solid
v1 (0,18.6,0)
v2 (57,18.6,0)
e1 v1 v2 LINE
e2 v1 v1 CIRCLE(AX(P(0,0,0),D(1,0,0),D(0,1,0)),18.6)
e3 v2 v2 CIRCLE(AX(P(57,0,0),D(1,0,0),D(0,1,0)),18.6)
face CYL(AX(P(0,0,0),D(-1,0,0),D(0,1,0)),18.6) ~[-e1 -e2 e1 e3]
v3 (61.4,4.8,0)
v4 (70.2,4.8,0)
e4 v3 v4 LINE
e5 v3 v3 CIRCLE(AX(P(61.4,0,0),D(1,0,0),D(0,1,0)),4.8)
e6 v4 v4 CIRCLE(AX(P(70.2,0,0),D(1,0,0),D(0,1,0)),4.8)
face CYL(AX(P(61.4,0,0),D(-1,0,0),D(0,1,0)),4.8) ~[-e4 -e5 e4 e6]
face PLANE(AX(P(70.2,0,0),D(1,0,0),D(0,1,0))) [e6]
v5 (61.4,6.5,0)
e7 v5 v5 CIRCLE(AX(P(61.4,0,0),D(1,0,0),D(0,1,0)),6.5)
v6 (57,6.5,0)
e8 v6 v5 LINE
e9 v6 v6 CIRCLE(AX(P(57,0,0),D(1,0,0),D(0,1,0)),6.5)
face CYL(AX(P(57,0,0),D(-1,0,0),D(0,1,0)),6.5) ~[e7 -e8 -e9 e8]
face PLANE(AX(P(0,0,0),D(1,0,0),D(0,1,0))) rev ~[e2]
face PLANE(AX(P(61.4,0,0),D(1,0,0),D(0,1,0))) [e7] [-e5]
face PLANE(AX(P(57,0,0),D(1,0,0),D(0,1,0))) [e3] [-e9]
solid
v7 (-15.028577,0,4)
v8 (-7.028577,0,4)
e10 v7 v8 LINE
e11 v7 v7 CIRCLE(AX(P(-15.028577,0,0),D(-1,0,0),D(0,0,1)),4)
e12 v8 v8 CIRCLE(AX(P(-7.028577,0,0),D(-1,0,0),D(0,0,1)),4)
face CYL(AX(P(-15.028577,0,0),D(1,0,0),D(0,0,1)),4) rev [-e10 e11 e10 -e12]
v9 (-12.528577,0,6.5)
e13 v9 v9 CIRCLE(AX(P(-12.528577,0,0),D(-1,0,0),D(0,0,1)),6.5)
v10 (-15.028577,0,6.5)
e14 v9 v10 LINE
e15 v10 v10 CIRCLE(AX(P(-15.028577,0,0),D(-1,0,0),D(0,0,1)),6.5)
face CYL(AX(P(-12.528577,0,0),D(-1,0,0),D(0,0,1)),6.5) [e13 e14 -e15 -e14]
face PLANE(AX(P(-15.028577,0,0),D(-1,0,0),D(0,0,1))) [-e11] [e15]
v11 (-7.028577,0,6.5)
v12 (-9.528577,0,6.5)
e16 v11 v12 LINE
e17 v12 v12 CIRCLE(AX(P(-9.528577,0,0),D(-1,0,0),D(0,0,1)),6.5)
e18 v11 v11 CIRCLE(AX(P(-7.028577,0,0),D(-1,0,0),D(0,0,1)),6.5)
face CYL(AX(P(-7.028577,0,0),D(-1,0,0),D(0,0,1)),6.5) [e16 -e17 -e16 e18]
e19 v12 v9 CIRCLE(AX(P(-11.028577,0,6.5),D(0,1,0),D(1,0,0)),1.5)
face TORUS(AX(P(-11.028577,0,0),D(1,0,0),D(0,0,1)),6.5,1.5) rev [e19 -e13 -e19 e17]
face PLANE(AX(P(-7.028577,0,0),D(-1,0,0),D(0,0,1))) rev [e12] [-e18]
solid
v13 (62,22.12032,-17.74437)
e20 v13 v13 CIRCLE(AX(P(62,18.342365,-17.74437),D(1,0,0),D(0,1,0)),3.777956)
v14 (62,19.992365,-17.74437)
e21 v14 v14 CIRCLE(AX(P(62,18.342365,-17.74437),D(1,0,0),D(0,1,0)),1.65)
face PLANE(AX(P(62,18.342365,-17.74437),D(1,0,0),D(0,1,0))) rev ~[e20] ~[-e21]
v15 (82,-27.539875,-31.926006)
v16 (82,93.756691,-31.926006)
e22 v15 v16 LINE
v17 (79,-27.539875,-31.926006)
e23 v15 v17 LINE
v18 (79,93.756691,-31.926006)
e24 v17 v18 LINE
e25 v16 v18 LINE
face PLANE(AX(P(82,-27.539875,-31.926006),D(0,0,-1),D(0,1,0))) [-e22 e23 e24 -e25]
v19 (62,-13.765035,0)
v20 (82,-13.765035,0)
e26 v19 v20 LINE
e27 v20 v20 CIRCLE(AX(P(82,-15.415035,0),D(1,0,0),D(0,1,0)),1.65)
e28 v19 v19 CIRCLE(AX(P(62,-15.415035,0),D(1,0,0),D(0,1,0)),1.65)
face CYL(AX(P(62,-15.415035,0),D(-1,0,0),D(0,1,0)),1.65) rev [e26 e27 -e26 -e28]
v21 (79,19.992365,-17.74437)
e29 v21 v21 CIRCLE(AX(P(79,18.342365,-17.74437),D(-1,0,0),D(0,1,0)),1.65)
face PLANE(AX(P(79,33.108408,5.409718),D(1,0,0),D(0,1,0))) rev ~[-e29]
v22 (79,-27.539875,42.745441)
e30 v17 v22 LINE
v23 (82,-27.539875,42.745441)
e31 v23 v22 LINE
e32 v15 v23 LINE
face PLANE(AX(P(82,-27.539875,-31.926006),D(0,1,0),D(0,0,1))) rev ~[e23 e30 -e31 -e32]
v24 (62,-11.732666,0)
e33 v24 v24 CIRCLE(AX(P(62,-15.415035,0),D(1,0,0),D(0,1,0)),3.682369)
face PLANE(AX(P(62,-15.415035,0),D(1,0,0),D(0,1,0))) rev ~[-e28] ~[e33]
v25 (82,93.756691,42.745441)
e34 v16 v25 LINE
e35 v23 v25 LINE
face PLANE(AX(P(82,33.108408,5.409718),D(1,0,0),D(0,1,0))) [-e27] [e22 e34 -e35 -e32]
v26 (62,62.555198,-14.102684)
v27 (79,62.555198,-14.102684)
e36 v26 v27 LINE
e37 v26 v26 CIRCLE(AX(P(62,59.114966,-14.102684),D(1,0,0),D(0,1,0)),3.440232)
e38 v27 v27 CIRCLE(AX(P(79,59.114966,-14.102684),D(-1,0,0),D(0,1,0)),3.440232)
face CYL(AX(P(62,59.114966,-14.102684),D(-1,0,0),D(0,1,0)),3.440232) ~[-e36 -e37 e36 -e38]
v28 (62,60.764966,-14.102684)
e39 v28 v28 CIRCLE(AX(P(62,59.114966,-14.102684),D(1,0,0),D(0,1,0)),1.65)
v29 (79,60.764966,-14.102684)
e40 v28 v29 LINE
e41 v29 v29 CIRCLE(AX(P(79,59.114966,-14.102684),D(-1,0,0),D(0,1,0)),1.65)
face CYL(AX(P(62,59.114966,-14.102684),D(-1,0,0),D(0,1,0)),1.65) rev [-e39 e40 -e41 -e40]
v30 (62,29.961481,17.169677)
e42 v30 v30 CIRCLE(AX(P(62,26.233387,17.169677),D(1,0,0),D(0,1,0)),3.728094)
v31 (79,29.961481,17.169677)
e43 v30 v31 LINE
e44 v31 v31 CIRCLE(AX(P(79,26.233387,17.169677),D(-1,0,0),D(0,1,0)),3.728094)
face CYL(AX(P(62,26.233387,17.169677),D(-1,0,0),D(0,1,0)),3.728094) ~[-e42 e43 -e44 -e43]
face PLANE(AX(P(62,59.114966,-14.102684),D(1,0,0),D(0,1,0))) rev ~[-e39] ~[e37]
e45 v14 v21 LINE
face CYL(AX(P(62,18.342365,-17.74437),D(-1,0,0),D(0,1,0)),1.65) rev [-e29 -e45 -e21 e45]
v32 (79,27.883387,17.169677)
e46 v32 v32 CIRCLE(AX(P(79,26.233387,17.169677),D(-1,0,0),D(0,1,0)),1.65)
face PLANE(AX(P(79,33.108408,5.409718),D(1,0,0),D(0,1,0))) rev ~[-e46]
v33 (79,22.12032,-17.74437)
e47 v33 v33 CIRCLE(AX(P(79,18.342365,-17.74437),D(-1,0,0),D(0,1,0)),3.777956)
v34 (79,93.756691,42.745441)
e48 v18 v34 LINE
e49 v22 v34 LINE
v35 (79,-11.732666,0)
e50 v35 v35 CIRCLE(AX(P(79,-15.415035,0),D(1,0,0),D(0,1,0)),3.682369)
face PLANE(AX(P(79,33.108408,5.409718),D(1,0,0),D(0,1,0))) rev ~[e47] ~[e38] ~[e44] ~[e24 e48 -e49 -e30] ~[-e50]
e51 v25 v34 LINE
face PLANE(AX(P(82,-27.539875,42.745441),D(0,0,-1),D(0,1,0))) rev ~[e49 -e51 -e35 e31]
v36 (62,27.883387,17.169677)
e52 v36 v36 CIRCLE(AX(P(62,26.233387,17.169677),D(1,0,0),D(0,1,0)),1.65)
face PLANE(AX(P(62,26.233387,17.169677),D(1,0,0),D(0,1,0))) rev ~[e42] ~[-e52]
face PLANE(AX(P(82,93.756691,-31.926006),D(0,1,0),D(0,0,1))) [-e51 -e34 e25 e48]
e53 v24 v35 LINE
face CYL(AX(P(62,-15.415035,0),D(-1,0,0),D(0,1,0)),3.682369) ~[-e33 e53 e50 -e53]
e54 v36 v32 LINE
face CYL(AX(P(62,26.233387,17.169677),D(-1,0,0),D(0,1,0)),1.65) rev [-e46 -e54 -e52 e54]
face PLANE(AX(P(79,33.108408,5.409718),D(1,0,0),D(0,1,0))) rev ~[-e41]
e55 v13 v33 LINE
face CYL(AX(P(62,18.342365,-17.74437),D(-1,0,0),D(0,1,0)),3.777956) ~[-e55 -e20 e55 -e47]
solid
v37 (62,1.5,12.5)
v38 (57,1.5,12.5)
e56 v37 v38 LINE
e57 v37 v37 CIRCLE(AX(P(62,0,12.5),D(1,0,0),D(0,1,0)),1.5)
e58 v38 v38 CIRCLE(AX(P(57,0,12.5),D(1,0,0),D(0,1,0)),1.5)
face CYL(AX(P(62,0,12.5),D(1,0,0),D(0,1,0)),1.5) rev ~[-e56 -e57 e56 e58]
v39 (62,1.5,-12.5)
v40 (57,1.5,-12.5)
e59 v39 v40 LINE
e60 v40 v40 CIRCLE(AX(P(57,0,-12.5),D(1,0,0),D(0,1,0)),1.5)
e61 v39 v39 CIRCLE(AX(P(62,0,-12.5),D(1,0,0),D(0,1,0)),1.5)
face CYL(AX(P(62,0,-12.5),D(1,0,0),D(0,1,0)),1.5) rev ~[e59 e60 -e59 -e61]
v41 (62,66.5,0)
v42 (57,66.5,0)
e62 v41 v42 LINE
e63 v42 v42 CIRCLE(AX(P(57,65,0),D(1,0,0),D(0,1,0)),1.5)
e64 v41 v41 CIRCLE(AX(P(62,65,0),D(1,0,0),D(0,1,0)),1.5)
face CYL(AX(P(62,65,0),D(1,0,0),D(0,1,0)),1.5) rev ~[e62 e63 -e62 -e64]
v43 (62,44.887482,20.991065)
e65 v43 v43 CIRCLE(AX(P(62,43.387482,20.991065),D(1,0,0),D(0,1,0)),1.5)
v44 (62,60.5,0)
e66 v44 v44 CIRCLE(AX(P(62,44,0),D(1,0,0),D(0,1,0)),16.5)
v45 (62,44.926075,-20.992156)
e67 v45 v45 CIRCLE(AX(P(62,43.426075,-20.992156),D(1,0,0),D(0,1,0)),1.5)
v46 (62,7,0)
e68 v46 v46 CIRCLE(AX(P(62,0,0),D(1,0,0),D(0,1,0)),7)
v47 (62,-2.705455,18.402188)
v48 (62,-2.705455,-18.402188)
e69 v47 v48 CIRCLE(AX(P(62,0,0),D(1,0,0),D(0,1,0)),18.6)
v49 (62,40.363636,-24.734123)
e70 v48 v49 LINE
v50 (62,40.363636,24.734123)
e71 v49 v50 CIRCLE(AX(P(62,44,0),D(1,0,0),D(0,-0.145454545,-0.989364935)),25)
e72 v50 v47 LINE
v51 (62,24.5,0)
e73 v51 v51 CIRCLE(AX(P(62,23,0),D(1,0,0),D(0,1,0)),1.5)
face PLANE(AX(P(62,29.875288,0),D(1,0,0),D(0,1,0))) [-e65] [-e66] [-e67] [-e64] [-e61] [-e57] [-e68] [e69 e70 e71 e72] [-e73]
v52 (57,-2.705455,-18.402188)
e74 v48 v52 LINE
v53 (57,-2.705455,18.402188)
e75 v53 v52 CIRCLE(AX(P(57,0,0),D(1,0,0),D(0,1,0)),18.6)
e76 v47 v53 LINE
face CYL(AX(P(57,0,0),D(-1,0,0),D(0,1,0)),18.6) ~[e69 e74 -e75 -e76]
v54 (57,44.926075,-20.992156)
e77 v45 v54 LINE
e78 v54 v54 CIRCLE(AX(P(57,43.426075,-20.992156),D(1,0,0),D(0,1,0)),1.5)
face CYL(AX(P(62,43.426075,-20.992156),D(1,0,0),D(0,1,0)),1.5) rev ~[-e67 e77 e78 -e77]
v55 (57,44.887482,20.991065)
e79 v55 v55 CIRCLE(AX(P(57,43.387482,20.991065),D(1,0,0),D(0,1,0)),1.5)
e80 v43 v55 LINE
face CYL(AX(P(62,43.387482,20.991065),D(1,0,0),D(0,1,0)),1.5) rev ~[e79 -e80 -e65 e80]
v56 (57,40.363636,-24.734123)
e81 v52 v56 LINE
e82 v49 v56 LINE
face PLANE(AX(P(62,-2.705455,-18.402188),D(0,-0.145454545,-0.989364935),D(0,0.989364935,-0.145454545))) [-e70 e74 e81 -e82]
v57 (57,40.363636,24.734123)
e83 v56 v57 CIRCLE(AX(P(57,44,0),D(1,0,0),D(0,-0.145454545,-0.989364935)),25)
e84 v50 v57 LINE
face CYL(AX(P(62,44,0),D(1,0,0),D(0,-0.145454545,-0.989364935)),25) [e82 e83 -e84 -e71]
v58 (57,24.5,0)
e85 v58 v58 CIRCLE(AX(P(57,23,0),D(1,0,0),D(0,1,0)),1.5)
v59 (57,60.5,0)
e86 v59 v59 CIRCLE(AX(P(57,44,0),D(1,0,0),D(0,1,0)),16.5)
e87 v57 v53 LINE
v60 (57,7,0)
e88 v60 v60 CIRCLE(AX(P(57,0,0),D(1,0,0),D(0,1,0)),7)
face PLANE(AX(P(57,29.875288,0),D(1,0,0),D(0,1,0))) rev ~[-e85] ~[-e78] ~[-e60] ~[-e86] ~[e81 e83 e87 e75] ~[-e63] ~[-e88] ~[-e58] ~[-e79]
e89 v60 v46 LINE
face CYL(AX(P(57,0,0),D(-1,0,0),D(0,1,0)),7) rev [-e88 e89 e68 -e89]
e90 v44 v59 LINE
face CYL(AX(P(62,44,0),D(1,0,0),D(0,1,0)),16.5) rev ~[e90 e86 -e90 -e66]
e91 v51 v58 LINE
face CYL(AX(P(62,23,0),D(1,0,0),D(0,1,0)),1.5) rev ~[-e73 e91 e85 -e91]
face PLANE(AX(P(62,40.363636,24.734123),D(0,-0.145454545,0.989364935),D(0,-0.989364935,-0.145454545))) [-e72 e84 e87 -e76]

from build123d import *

# Parameters (mm, degrees)
F0_R      = 18.6
F1_DEPTH  = 57
F2_R      = 6.5
F3_DEPTH  = 4.4
F4_R      = 4.8
F5_DEPTH  = 8.8
F6_R      = 18.6
F6_R_2    = 7
F7_DEPTH  = 5
F8_R      = 25
F8_R_2    = 16.5
F9_DEPTH  = 5
F11_R     = 16.5
F12_DEPTH = 5
F13_R     = 1.5
F14_DEPTH = 25
F15_R     = 1.5
F16_DEPTH = 25
F20_R     = 3.7280937336
F20_R_2   = 1.65
F21_DEPTH = 20
F20_R_3   = 3.440231923
F20_R_4   = 3.7779559
F20_R_5   = 3.6823688958
F22_W     = 121.2965659797
F22_H     = 74.6714472771
F22_R     = 3.6823688958
F23_DEPTH = 3


with BuildPart() as f1:
    # F0 (on Right) → F1 (new body)
    with BuildSketch(Plane.YZ):
        Circle(F0_R)
    extrude(amount=F1_DEPTH)

    # F2 (on face) → F3 (join)
    with BuildSketch(Plane.YZ.offset(57)):
        Circle(F2_R)
    extrude(amount=F3_DEPTH)

    # F4 (on face) → F5 (join)
    with BuildSketch(Plane.YZ.offset(61.4)):
        Circle(F4_R)
    extrude(amount=F5_DEPTH)


with BuildPart() as f7:
    # F6 (on face) → F7 (new body)
    with BuildSketch(Plane.YZ.offset(57)):
        Circle(F6_R)
        Circle(F6_R_2, mode=Mode.SUBTRACT)
    extrude(amount=F7_DEPTH)

    # F11 (on face) → F12 (join)
    with BuildSketch(Plane.YZ.offset(62)):
        with BuildLine():
            Line((40.3636363636, 24.7341233826), (-2.7054545455, 18.4021877966))
            ThreePointArc((-2.7054545455, 18.4021877966), (12.1580949465, 14.0762469172), (18.6, 0))
            ThreePointArc((18.6, 0), (12.1580949465, -14.0762469172), (-2.7054545455, -18.4021877966))
            Line((-2.7054545455, -18.4021877966), (40.3636363636, -24.7341233826))
            ThreePointArc((40.3636363636, -24.7341233826), (69, 0), (40.3636363636, 24.7341233826))
        make_face()
        with Locations((44, 0)):
            Circle(F11_R, mode=Mode.SUBTRACT)
    extrude(amount=-F12_DEPTH)

    # F13 (on face) → F14 (cut)
    with BuildSketch(Plane.YZ.offset(62)):
        with Locations((0, 12.5)):
            Circle(F13_R)
        with Locations((0, -12.5)):
            Circle(F13_R)
    extrude(amount=-F14_DEPTH, mode=Mode.SUBTRACT)

    # F15 (on face) → F16 (cut)
    with BuildSketch(Plane.YZ.offset(62)):
        with Locations((23, 0)):
            Circle(F15_R)
        with Locations((43.3874823415, 20.9910652926)):
            Circle(F15_R)
        with Locations((65, 0)):
            Circle(F15_R)
        with Locations((43.4260752234, -20.9921559243)):
            Circle(F15_R)
    extrude(amount=-F16_DEPTH, mode=Mode.SUBTRACT)


with BuildPart() as f9:
    # F8 (on face) → F9 (new body)
    with BuildSketch(Plane.YZ.offset(62)):
        with Locations((45, 0)):
            Circle(F8_R)
        with Locations((45, 0)):
            Circle(F8_R_2, mode=Mode.SUBTRACT)
    extrude(amount=-F9_DEPTH)


with BuildPart() as f18:
    # F17 (on Front) → F18 (revolve)
    with BuildSketch(Plane.XZ):
        with BuildLine():
            Line((-15.0285773807, 6.5), (-15.0285773807, 4))
            Line((-15.0285773807, 4), (-7.0285773807, 4))
            Line((-7.0285773807, 4), (-7.0285773807, 6.5))
            Line((-7.0285773807, 6.5), (-9.5285773807, 6.5))
            ThreePointArc((-9.5285773807, 6.5), (-11.0285773807, 5), (-12.5285773807, 6.5))
            Line((-12.5285773807, 6.5), (-15.0285773807, 6.5))
        make_face()
    revolve(axis=Axis((-10.1703209803, 0, 0), (-1, 0, 0)))


with BuildPart() as f21:
    # F20 (on face) → F21 (new body)
    with BuildSketch(Plane.YZ.offset(62)):
        with Locations((26.2333868136, 17.169676806)):
            Circle(F20_R)
        with Locations((26.2333868136, 17.169676806)):
            Circle(F20_R_2, mode=Mode.SUBTRACT)
    extrude(amount=F21_DEPTH)



with BuildPart() as f21b:
    # F20 (on face) → F21, piece 2 (new body)
    with BuildSketch(Plane.YZ.offset(62)):
        with Locations((59.1149660932, -14.1026837679)):
            Circle(F20_R_3)
        with Locations((59.1149660932, -14.1026837679)):
            Circle(F20_R_2, mode=Mode.SUBTRACT)
    extrude(amount=F21_DEPTH)


with BuildPart() as f21c:
    # F20 (on face) → F21, piece 3 (new body)
    with BuildSketch(Plane.YZ.offset(62)):
        with Locations((18.3423645794, -17.7443698049)):
            Circle(F20_R_4)
        with Locations((18.3423645794, -17.7443698049)):
            Circle(F20_R_2, mode=Mode.SUBTRACT)
    extrude(amount=F21_DEPTH)


with BuildPart() as f21d:
    # F20 (on face) → F21, piece 4 (new body)
    with BuildSketch(Plane.YZ.offset(62)):
        with Locations((-15.4150349557, 0)):
            Circle(F20_R_5)
        with Locations((-15.4150349557, 0)):
            Circle(F20_R_2, mode=Mode.SUBTRACT)
    extrude(amount=F21_DEPTH)


with BuildPart() as f21_1:
    add(f21.part)

    add(f21b.part)  # F23 merges F21b

    add(f21c.part)  # F23 merges F21c

    add(f21d.part)  # F23 merges F21d
    # F22 (on face) → F23 (join)
    with BuildSketch(Plane.YZ.offset(82)):
        with Locations((33.1084076315, 5.4097175598)):
            Rectangle(F22_W, F22_H)
        with Locations((-15.4150349557, 0)):
            Circle(F22_R, mode=Mode.SUBTRACT)
    extrude(amount=-F23_DEPTH)


solid = Compound([f1.part, f7.part, f18.part, f21_1.part])
